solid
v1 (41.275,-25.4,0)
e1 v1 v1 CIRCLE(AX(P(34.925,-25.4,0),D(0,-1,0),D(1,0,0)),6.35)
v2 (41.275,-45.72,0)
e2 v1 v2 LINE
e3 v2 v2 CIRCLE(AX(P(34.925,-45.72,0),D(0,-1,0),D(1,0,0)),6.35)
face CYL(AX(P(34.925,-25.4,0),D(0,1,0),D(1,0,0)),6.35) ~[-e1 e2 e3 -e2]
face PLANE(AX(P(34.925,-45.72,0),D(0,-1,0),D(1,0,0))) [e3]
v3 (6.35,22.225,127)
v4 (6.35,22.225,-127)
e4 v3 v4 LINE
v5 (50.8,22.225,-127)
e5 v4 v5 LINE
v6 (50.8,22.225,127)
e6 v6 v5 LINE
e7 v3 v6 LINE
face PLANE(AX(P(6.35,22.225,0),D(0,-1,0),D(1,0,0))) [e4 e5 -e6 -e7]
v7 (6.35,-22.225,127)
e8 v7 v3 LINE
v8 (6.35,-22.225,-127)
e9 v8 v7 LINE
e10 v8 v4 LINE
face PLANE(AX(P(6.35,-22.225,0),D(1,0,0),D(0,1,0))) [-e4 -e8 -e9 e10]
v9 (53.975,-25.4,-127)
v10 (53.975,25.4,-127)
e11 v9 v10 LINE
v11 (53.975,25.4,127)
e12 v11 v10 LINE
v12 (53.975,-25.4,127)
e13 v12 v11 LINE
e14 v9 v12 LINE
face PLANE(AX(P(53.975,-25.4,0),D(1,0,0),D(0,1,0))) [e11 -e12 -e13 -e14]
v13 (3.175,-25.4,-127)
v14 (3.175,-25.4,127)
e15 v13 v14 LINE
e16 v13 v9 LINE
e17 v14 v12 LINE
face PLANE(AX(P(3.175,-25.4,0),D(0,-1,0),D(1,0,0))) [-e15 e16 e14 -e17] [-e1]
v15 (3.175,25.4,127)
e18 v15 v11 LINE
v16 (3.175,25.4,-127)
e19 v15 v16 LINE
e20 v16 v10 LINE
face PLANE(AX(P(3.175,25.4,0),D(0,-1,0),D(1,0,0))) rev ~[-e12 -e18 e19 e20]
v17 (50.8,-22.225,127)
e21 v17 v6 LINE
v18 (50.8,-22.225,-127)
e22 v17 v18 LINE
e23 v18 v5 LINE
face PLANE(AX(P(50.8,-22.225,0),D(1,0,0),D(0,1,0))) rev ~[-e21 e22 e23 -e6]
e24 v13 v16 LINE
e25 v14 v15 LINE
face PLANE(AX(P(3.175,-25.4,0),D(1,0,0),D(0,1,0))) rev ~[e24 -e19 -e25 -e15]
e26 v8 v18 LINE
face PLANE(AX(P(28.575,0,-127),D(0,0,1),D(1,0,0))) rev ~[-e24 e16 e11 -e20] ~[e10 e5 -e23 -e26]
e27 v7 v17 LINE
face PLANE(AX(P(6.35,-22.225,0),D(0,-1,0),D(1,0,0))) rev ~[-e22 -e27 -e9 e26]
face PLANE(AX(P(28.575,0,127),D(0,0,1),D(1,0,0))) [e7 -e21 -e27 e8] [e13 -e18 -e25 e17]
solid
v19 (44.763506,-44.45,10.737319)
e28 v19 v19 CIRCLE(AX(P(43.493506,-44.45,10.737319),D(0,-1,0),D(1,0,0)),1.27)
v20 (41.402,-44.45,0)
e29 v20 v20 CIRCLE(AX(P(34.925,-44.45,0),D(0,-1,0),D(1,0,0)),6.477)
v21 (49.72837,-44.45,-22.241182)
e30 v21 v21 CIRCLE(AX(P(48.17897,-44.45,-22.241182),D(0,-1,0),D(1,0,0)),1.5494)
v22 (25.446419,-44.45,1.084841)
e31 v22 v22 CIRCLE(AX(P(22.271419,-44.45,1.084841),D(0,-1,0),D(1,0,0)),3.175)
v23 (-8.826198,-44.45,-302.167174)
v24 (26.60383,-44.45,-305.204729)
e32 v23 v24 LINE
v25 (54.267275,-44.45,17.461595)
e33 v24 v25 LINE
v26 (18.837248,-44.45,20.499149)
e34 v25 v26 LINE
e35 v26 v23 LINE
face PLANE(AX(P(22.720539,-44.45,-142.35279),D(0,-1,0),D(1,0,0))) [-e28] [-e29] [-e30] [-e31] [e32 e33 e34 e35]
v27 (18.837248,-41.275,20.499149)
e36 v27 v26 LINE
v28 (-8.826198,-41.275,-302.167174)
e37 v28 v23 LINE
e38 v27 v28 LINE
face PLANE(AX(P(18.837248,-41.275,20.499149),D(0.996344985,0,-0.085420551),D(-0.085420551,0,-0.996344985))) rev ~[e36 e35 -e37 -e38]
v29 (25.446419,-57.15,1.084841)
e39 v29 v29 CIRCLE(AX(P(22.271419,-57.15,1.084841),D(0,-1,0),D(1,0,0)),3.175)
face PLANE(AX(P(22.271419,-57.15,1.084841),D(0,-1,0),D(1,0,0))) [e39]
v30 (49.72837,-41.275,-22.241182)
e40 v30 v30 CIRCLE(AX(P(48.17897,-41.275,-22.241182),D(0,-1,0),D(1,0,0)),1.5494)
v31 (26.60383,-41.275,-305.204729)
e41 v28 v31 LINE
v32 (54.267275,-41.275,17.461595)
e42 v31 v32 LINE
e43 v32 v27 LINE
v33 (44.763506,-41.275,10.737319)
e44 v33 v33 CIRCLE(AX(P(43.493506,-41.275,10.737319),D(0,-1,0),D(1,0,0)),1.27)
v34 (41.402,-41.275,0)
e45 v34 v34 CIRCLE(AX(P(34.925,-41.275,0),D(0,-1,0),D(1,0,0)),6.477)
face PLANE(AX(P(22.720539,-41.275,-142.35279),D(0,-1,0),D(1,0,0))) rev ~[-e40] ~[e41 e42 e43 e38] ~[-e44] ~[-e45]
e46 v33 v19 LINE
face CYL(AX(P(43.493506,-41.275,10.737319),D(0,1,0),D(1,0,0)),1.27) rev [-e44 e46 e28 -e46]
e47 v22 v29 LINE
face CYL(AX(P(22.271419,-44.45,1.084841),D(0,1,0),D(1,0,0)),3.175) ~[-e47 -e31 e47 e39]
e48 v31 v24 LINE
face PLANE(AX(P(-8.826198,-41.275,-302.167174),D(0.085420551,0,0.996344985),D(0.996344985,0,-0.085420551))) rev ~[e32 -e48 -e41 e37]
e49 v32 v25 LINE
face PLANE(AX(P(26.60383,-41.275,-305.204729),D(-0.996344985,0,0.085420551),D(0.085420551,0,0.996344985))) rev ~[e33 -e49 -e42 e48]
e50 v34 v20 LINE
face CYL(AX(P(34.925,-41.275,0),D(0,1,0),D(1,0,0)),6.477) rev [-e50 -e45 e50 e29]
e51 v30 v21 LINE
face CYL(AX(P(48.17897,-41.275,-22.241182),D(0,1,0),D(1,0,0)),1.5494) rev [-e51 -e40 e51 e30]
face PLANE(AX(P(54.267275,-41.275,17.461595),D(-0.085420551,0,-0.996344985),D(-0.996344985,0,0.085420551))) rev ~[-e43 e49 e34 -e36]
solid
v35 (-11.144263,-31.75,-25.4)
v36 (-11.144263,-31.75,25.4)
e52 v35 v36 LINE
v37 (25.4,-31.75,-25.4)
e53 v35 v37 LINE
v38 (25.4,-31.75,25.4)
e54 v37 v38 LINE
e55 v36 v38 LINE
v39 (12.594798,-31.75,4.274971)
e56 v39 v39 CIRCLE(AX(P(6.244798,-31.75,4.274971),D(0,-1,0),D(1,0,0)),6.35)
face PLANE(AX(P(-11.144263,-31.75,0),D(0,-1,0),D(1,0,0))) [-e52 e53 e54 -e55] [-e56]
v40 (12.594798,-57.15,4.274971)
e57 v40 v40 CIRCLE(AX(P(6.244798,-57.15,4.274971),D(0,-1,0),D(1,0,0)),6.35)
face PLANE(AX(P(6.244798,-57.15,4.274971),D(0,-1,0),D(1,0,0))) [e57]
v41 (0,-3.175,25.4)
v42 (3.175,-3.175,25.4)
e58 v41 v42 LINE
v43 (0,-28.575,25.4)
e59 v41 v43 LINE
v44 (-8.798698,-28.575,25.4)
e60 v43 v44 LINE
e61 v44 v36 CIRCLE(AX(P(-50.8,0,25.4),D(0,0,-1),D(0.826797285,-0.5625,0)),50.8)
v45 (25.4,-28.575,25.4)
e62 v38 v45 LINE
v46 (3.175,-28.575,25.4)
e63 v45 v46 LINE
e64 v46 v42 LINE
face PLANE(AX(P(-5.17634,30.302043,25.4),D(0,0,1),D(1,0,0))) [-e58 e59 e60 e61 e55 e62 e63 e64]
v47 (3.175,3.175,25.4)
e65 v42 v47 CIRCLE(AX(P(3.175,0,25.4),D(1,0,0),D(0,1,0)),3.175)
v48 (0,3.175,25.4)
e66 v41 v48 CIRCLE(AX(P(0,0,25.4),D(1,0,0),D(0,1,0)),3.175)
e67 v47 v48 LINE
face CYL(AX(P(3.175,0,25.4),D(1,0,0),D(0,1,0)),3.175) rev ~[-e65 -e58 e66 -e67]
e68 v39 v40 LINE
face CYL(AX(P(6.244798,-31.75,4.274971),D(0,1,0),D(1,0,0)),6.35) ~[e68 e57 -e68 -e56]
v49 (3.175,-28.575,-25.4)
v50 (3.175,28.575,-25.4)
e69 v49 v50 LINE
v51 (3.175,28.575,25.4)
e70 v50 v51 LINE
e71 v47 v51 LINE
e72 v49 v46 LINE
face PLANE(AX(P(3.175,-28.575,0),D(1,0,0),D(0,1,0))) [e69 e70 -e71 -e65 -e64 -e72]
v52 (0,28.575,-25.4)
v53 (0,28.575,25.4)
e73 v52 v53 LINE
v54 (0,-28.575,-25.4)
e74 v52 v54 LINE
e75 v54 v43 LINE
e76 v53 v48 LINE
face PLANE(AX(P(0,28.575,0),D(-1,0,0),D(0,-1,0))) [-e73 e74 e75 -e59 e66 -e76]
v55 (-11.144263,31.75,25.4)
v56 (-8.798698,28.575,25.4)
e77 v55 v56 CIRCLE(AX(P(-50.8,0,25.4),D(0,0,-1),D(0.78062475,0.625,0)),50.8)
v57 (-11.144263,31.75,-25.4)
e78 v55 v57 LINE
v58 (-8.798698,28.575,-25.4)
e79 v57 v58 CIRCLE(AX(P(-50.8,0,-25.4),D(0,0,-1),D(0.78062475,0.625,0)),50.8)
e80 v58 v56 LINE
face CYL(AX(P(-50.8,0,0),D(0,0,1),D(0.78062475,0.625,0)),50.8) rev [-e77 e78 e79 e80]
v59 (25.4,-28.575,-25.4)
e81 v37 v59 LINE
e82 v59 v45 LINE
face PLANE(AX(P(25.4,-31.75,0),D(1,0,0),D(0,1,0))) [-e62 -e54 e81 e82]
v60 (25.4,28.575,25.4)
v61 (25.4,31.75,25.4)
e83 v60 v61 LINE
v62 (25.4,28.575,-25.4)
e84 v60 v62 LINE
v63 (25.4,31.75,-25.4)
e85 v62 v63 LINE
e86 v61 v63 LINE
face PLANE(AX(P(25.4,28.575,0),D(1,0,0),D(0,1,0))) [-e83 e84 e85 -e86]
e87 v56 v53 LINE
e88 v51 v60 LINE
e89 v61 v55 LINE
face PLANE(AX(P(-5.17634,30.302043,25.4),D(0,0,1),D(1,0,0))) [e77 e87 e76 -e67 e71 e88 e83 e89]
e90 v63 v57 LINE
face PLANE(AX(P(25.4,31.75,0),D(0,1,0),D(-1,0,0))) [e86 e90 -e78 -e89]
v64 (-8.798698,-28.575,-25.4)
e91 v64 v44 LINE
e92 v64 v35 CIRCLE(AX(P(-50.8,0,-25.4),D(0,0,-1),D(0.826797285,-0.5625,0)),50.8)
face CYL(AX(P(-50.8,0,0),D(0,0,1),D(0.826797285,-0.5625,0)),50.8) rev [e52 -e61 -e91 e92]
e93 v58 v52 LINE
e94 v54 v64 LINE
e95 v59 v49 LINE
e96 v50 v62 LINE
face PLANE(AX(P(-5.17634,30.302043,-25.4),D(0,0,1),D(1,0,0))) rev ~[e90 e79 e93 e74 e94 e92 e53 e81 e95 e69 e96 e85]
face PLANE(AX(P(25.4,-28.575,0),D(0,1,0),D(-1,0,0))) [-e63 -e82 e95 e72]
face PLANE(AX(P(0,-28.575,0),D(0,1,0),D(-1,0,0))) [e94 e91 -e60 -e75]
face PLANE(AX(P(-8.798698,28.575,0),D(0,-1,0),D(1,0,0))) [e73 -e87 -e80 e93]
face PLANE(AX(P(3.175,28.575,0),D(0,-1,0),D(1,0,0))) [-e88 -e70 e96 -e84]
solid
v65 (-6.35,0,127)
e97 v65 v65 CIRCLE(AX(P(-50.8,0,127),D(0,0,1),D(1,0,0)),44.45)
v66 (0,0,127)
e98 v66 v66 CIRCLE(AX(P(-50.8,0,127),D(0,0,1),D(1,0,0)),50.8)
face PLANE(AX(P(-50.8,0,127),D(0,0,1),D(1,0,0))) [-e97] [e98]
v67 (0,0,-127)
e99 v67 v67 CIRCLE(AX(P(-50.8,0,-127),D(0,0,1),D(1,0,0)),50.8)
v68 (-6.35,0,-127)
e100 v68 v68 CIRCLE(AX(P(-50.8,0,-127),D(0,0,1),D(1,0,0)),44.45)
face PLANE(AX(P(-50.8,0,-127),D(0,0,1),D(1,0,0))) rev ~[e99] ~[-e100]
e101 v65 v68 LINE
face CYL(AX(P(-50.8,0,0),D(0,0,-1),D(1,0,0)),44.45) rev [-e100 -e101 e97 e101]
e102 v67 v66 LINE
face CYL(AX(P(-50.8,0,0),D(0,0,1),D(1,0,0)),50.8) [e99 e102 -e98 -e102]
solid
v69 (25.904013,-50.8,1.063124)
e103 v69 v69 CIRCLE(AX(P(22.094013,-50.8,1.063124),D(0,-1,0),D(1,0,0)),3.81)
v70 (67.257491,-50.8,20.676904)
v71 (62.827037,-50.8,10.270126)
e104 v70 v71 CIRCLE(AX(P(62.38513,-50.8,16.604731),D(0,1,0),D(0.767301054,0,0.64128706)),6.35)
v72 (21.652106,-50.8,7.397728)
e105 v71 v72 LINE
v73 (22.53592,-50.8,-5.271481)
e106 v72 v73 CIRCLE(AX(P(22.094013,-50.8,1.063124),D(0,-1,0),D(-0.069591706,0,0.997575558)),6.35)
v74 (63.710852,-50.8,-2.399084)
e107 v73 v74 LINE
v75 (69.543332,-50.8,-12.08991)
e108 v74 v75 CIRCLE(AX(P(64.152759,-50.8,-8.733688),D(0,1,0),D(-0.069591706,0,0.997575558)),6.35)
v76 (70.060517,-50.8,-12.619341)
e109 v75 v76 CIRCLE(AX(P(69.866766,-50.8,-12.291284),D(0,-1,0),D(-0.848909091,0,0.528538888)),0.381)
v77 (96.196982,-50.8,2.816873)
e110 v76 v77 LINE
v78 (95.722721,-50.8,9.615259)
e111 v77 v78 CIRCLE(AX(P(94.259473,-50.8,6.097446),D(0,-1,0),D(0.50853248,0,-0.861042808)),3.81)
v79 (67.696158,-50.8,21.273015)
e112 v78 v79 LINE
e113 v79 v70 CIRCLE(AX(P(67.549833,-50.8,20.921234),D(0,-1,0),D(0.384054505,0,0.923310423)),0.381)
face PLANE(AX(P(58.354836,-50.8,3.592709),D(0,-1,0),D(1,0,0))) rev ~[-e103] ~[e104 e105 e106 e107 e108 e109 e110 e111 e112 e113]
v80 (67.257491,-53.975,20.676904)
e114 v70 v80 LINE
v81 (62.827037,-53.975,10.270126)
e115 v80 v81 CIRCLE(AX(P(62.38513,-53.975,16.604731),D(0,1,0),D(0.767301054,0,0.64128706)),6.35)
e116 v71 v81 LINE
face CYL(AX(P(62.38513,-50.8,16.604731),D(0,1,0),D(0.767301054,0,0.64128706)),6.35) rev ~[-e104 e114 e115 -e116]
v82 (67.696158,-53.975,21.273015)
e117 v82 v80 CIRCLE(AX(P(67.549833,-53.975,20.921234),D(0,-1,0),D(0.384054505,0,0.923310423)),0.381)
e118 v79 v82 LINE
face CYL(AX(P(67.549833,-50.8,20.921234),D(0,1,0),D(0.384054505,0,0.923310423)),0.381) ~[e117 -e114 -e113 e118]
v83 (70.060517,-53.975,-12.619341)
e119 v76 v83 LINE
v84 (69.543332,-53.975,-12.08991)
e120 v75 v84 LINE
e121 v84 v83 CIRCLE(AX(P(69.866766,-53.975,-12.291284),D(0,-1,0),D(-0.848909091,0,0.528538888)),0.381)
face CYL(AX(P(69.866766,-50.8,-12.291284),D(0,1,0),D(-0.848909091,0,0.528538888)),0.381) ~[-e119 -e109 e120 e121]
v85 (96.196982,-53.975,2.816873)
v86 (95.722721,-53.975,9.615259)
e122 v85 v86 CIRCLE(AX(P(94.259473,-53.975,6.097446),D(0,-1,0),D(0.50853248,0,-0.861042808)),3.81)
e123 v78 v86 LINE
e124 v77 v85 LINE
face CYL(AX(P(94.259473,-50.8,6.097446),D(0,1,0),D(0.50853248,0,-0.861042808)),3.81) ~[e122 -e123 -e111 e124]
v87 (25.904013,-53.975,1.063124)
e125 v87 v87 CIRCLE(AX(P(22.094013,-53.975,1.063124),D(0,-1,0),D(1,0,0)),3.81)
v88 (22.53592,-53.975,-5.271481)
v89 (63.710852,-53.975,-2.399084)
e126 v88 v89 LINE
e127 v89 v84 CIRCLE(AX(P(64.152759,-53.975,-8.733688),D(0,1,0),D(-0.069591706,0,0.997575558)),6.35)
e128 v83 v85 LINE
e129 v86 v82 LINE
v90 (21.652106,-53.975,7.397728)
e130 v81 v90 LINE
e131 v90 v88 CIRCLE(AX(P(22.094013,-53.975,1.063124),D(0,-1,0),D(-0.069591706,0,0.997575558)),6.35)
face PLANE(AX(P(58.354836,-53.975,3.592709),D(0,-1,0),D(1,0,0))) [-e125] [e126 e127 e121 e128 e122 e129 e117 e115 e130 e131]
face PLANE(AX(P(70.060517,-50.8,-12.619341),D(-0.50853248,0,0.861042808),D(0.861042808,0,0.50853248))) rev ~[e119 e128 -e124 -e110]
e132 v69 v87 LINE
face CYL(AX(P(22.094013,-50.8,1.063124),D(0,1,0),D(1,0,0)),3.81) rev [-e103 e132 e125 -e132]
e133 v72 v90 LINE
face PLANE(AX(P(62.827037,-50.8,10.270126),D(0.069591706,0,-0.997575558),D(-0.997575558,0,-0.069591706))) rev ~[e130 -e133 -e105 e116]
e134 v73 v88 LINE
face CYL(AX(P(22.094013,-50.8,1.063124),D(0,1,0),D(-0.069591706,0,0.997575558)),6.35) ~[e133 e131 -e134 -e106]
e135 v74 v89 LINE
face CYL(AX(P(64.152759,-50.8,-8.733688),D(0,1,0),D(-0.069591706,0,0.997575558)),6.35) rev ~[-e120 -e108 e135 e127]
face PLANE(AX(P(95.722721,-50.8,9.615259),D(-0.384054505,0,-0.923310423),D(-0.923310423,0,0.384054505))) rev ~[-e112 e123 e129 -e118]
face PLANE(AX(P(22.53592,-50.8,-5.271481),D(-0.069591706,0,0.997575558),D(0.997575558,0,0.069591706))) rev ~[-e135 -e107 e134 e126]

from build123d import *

# Parameters (mm, degrees)
F1_DEPTH  = 25.4
F2_R      = 3.175
F3_DEPTH  = 14.3202627102
F4_R      = 50.8
F4_R_2    = 44.45
F5_DEPTH  = 127
F4_W      = 50.8
F4_H      = 50.8
F4_W_2    = 44.45
F4_H_2    = 44.45
F6_R      = 6.35
F7_DEPTH  = 25.4
F8_R      = 6.35
F9_DEPTH  = 20.32
F11_START = 50.8
F10_R     = 3.81
F11_DEPTH = 3.175
F12_START = 15.875
F8_R_2    = 3.175
F8_R_3    = 6.477
F8_R_4    = 1.5494
F8_R_5    = 1.27
F12_DEPTH = 3.175
F13_START = 19.05
F13_DEPTH = 12.7


# Not quite as in the source:
# - a feature names something its author has since deleted; it is built from what else it names


with BuildPart() as f1:
    # F0 (on Top) → F1 (new body, symmetric)
    with BuildSketch(Plane.XY):
        with BuildLine():
            Line((0, 28.575), (0, 31.75))
            Line((0, 31.75), (-11.1442627102, 31.75))
            ThreePointArc((-11.1442627102, 31.75), (-9.940629285, 30.1852915304), (-8.7986979368, 28.575))
            Line((-8.7986979368, 28.575), (0, 28.575))
        make_face()
        Polygon((25.4, 28.575), (25.4, 31.75), (0, 31.75), (0, 28.575), (0, -28.575), (0, -31.75), (25.4, -31.75), (25.4, -28.575), (3.175, -28.575), (3.175, 28.575), align=None)
        with BuildLine():
            Line((0, -31.75), (0, -28.575))
            Line((0, -28.575), (-8.7986979368, -28.575))
            ThreePointArc((-8.7986979368, -28.575), (-9.940629285, -30.1852915304), (-11.1442627102, -31.75))
            Line((-11.1442627102, -31.75), (0, -31.75))
        make_face()
    extrude(amount=F1_DEPTH, both=True)

    # F2 (on face) → F3 (cut, through all)
    with BuildSketch(Plane.YZ.offset(3.175)):
        with Locations((0, 25.4)):
            Circle(F2_R)
    extrude(amount=-F3_DEPTH, mode=Mode.SUBTRACT)

    # F6 (on face) → F7 (join)
    with BuildSketch(Plane.XZ.offset(31.75)):
        with Locations((6.2447981909, 4.2749713175)):
            Circle(F6_R)
    extrude(amount=F7_DEPTH)


with BuildPart() as f5:
    # F4 (on Top) → F5 (new body, symmetric)
    with BuildSketch(Plane.XY):
        with Locations((-50.8, 0)):
            Circle(F4_R)
        with Locations((-50.8, 0)):
            Circle(F4_R_2, mode=Mode.SUBTRACT)
    extrude(amount=F5_DEPTH, both=True)


with BuildPart() as f5b:
    # F4 (on Top) → F5, piece 2 (new body, symmetric)
    with BuildSketch(Plane.XY):
        with Locations((28.575, 0)):
            Rectangle(F4_W, F4_H)
        with Locations((28.575, 0)):
            Rectangle(F4_W_2, F4_H_2, mode=Mode.SUBTRACT)
    extrude(amount=F5_DEPTH, both=True)

    # F8 (on face) → F9 (join)
    with BuildSketch(Plane.XZ.offset(25.4)):
        with Locations((34.925, 0)):
            Circle(F8_R)
    extrude(amount=F9_DEPTH)


with BuildPart() as f11:
    # F10 (on Front) → F11 (new body)
    with BuildSketch(Plane.XZ.offset(F11_START)):
        with BuildLine():
            Line((62.8270369727, 10.2701259875), (21.6521058039, 7.3977283401))
            ThreePointArc((21.6521058039, 7.3977283401), (15.759408339, 0.6212162145), (22.5359204646, -5.2714812503))
            Line((22.5359204646, -5.2714812503), (63.7108516334, -2.3990836029))
            ThreePointArc((63.7108516334, -2.3990836029), (69.5933796071, -5.4592194313), (69.5433316896, -12.0899103346))
            ThreePointArc((69.5433316896, -12.0899103346), (69.5942249576, -12.5575210472), (70.0605169279, -12.6193409606))
            Line((70.0605169279, -12.6193409606), (96.1969817693, 2.8168733057))
            ThreePointArc((96.1969817693, 2.8168733057), (98.0602358988, 6.3625908021), (95.7227206874, 9.6152591148))
            Line((95.7227206874, 9.6152591148), (67.6961578025, 21.2730152514))
            ThreePointArc((67.6961578025, 21.2730152514), (67.2429657872, 21.1470513659), (67.2574913344, 20.6769036107))
            ThreePointArc((67.2574913344, 20.6769036107), (68.2276991914, 14.1173866037), (62.8270369727, 10.2701259875))
        make_face()
        with Locations((22.0940131342, 1.0631235449)):
            Circle(F10_R, mode=Mode.SUBTRACT)
    extrude(amount=F11_DEPTH)


with BuildPart() as f12:
    # F8 (on face) → F12 (new body)
    with BuildSketch(Plane.XZ.offset(25.4).offset(F12_START)):
        Polygon((18.8372476626, 20.499149366), (-8.8261978146, -302.1671740772), (26.6038298576, -305.2047288747), (54.2672753347, 17.4615945685), align=None)
        with Locations((22.2714186885, 1.0848409991)):
            Circle(F8_R_2, mode=Mode.SUBTRACT)
        with Locations((34.925, 0)):
            Circle(F8_R_3, mode=Mode.SUBTRACT)
        with Locations((48.1789697316, -22.2411817218)):
            Circle(F8_R_4, mode=Mode.SUBTRACT)
        with Locations((43.4935056861, 10.7373185809)):
            Circle(F8_R_5, mode=Mode.SUBTRACT)
        with Locations((22.2714186885, 1.0848409991)):
            Circle(F8_R_2)
    extrude(amount=F12_DEPTH)

    # F8 (on face) → F13 (join)
    with BuildSketch(Plane.XZ.offset(25.4).offset(F13_START)):
        with Locations((22.2714186885, 1.0848409991)):
            Circle(F8_R_2)
    extrude(amount=F13_DEPTH)


solid = Compound([f1.part, f5.part, f5b.part, f11.part, f12.part])
